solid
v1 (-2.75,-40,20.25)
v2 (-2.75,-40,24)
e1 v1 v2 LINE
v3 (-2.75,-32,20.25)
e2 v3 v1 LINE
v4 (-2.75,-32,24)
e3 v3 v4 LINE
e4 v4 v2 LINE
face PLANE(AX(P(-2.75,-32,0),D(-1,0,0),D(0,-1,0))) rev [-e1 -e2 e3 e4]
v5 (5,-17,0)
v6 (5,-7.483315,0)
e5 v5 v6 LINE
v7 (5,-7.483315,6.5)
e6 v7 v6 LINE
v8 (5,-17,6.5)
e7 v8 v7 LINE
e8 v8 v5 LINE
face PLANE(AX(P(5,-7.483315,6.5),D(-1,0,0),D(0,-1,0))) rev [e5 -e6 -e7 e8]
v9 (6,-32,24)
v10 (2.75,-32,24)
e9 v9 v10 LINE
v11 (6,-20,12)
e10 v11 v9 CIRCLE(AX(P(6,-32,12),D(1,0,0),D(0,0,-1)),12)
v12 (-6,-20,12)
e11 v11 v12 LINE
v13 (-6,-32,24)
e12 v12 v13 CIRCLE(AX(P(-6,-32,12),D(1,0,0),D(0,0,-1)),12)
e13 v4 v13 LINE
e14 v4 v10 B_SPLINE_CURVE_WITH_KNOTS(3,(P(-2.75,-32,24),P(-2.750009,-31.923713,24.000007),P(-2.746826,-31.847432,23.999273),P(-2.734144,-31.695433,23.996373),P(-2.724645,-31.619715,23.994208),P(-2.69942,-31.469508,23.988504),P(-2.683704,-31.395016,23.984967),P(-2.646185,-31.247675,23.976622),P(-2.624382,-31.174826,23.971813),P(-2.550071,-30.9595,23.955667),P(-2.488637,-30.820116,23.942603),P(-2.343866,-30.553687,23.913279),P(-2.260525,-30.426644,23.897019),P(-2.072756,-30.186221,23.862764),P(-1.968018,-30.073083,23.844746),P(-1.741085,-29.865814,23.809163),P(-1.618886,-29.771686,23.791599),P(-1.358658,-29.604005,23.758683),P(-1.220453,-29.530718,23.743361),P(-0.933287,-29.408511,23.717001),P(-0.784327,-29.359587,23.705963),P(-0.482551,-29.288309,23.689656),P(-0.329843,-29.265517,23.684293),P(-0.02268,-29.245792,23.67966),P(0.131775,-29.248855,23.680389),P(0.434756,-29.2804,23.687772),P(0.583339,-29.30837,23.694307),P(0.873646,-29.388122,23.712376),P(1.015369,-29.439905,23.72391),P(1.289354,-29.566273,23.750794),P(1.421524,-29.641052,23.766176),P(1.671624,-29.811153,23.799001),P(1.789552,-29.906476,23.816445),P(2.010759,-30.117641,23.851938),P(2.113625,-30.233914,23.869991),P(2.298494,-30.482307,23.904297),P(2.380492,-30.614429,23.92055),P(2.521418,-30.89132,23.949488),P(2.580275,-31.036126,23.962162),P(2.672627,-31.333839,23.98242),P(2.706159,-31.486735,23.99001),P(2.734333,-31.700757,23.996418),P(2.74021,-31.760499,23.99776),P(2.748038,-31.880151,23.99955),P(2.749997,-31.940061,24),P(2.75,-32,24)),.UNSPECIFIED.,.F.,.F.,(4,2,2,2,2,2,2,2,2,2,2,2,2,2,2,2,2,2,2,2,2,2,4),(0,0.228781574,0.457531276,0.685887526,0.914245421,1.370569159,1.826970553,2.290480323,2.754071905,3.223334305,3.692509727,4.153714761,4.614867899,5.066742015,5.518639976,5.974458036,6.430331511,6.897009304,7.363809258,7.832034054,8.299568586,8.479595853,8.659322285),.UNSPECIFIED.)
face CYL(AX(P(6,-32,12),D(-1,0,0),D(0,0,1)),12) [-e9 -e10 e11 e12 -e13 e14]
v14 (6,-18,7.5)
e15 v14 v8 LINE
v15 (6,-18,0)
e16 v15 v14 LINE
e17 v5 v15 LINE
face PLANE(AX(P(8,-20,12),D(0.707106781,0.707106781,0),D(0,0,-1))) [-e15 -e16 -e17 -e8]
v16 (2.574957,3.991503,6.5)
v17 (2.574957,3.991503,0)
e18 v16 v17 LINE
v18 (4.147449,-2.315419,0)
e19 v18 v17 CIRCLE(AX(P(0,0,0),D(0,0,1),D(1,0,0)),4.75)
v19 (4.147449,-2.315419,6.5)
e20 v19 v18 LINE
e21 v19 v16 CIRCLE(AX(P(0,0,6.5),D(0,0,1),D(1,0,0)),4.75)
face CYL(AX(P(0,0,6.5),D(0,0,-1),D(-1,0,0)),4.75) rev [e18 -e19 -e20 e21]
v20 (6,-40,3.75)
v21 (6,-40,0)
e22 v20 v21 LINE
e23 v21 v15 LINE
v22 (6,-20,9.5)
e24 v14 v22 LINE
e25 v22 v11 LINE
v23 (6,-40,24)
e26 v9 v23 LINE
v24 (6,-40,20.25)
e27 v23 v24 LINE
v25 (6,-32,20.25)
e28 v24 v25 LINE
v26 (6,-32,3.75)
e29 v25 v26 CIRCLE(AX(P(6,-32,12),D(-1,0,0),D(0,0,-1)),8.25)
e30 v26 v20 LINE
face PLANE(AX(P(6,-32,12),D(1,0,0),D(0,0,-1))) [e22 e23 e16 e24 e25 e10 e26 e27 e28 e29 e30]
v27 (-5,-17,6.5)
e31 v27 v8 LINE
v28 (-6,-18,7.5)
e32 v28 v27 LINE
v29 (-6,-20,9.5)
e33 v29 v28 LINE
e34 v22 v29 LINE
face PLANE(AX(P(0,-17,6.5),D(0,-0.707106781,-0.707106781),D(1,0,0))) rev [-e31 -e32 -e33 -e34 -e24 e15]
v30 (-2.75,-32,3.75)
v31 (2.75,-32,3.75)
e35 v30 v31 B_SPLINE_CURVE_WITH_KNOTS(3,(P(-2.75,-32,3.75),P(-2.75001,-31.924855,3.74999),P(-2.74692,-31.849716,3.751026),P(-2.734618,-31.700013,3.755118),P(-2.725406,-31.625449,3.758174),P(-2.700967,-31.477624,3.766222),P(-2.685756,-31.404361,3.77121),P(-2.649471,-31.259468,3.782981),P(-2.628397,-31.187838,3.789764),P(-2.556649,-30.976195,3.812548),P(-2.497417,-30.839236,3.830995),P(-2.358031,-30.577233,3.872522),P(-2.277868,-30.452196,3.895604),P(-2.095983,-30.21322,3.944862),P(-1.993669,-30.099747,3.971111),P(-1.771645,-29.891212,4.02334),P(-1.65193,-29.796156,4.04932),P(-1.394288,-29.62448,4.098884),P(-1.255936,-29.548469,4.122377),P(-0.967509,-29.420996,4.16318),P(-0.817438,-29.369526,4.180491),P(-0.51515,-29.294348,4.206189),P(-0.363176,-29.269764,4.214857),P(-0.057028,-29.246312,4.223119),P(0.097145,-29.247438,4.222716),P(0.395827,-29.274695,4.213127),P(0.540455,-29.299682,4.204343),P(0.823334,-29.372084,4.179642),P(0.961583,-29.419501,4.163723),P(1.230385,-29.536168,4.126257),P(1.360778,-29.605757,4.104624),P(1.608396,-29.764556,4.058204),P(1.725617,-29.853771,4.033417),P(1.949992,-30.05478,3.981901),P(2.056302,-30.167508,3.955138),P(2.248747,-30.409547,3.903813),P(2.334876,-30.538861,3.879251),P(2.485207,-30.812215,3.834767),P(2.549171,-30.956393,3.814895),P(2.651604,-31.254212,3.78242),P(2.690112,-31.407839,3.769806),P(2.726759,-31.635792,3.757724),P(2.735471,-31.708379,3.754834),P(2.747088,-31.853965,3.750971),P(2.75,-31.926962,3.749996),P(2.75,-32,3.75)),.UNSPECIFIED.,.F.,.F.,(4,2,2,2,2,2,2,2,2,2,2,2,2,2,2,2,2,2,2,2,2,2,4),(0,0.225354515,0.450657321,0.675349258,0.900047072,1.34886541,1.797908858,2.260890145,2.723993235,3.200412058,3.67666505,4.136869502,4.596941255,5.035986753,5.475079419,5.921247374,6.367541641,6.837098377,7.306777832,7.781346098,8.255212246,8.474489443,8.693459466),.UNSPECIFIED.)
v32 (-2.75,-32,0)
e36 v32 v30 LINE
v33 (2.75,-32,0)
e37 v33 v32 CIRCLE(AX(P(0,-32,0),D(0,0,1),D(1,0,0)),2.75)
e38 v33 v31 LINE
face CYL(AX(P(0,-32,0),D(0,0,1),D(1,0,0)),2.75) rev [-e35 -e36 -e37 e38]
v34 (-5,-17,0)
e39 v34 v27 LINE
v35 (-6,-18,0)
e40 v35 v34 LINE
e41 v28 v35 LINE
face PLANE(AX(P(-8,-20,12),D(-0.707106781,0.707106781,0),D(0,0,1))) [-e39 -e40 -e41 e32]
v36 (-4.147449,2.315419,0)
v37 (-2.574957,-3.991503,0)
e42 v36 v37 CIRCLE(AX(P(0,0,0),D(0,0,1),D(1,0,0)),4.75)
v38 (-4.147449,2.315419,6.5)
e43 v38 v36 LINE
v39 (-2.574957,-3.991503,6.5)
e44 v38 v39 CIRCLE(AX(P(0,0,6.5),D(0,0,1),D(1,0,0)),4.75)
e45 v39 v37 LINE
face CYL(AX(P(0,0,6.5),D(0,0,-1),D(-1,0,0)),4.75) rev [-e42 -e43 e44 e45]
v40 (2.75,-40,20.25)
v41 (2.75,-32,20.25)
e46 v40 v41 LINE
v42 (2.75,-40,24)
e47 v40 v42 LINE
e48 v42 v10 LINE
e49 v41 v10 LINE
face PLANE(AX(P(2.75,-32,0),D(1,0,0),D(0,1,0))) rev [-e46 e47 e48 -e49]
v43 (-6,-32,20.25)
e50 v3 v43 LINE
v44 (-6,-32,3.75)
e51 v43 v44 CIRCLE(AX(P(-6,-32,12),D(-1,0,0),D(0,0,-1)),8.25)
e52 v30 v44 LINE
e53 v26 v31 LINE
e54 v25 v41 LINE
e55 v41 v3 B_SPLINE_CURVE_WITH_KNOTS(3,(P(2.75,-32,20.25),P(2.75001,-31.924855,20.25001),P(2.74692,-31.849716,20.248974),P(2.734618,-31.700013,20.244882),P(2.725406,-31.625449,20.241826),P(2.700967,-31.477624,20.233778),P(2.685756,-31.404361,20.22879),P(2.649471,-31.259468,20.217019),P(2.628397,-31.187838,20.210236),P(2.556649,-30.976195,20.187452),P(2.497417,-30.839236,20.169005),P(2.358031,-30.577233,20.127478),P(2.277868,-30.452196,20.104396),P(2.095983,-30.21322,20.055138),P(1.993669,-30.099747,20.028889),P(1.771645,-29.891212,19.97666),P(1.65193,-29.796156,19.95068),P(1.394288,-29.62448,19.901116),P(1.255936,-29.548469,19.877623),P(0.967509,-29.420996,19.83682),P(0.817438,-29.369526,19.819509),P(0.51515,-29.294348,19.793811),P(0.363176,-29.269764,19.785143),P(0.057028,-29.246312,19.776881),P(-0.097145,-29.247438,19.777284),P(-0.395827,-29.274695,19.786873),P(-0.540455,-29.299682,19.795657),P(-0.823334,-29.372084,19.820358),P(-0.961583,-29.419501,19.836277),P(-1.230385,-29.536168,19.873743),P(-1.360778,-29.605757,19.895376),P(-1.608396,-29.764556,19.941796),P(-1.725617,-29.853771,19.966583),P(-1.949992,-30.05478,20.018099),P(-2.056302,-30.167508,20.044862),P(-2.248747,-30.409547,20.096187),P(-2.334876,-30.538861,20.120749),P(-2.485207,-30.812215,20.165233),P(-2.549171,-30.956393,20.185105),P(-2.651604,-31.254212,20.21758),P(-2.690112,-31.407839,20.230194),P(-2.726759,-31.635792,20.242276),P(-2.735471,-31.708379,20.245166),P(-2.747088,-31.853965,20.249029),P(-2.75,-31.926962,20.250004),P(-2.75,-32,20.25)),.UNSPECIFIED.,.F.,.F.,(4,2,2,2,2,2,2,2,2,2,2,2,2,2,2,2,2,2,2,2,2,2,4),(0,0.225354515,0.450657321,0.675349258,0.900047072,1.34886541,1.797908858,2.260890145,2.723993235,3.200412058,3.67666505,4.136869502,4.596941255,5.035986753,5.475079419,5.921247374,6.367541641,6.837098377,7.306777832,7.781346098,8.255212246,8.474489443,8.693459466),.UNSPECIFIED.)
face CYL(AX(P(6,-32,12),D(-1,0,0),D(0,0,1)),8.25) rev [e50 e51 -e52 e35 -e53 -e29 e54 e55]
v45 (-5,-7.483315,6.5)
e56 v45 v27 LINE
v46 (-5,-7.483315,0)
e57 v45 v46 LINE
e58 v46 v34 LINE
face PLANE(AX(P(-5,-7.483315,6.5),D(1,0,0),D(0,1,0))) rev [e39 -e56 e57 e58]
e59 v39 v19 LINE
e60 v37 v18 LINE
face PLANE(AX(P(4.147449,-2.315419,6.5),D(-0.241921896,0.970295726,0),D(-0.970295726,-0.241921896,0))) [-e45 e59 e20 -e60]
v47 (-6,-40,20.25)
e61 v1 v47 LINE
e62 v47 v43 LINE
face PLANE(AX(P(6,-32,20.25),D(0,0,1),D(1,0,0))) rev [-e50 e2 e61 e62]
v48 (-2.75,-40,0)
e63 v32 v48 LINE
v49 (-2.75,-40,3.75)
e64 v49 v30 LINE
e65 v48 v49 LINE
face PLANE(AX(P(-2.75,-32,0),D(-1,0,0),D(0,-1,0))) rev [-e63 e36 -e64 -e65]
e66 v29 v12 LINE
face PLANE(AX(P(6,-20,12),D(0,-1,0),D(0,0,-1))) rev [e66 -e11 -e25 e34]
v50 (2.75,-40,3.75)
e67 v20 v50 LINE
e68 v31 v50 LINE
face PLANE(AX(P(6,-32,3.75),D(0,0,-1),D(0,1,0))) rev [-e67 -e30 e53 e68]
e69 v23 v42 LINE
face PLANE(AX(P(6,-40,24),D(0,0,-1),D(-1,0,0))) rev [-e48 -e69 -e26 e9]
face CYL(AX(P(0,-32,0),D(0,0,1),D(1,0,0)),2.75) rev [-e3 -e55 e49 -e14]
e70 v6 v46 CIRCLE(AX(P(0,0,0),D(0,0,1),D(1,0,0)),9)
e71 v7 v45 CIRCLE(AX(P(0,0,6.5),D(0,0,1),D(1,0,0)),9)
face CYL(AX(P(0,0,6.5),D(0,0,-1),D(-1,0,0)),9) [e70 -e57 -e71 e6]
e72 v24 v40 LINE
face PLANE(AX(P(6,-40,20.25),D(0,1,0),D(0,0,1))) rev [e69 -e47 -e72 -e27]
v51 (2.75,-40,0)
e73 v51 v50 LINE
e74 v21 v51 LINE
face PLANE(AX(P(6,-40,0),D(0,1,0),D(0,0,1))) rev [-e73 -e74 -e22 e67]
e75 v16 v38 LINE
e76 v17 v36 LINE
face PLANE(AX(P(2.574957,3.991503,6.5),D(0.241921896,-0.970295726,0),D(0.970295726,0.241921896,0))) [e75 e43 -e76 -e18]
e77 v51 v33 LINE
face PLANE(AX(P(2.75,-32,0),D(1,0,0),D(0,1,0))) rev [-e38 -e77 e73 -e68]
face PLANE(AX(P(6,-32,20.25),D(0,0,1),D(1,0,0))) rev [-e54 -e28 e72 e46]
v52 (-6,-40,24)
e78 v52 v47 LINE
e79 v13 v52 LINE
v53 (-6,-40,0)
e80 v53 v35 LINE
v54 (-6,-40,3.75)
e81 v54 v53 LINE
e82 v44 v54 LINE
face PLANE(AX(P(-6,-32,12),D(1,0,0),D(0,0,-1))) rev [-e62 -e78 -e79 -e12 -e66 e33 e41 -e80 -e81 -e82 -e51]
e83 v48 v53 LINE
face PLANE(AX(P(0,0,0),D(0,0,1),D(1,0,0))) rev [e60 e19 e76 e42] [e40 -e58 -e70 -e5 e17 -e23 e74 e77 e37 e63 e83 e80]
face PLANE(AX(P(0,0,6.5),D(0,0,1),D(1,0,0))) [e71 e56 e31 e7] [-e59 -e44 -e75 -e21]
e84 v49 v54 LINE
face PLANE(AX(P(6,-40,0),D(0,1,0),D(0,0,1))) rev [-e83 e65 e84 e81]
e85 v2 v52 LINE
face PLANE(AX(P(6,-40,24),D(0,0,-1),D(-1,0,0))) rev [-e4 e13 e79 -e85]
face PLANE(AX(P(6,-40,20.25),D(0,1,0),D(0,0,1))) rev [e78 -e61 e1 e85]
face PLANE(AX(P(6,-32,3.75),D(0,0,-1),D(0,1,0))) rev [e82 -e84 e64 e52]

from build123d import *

# Parameters (mm, degrees)
BOSS_EXTRUDE1_DEPTH = 6.5
BOSS_EXTRUDE2_DEPTH = 6
CUT_EXTRUDE1_DEPTH  = 48.507894081
CHAMFER1_SIZE       = 3


with BuildPart() as part:
    # Sketch1 → Boss-Extrude1 (new body)
    with BuildSketch(Plane.XY):
        with BuildLine():
            Line((-5, -7.483314774), (-5, -22))
            Line((-5, -22), (5, -22))
            Line((5, -22), (5, -7.483314774))
            ThreePointArc((5, -7.483314774), (0, 9), (-5, -7.483314774))
        make_face()
        with BuildLine():
            Line((2.574956832, 3.99150314), (-4.147449153, 2.315419081))
            ThreePointArc((-4.147449153, 2.315419081), (-4.6089047, -1.149129004), (-2.574956832, -3.99150314))
            Line((-2.574956832, -3.99150314), (4.147449153, -2.315419081))
            ThreePointArc((4.147449153, -2.315419081), (4.6089047, 1.149129004), (2.574956832, 3.99150314))
        make_face(mode=Mode.SUBTRACT)
    extrude(amount=BOSS_EXTRUDE1_DEPTH)

    # Sketch2 → Boss-Extrude2 (add, symmetric)
    with BuildSketch(Plane(origin=(0, 0, 0), x_dir=(0, 0, -1), z_dir=(1, 0, 0))):
        with BuildLine():
            Line((-12, -20), (0, -20))
            Line((0, -20), (0, -40))
            Line((0, -40), (-3.75, -40))
            Line((-3.75, -40), (-3.75, -32))
            ThreePointArc((-3.75, -32), (-12, -23.75), (-20.25, -32))
            Line((-20.25, -32), (-20.25, -40))
            Line((-20.25, -40), (-24, -40))
            Line((-24, -40), (-24, -32))
            ThreePointArc((-24, -32), (-20.485281374, -23.514718626), (-12, -20))
        make_face()
    extrude(amount=BOSS_EXTRUDE2_DEPTH, both=True)

    # Sketch4 → Cut-Extrude1 (cut, through all)
    with BuildSketch(Plane.XY.offset(24)):
        with BuildLine():
            Line((-2.75, -32), (-2.75, -40))
            Line((-2.75, -40), (2.75, -40))
            Line((2.75, -40), (2.75, -32))
            ThreePointArc((2.75, -32), (0, -29.25), (-2.75, -32))
        make_face()
    extrude(amount=-CUT_EXTRUDE1_DEPTH, mode=Mode.SUBTRACT)

    # Chamfer1
    # the kernel refuses this chamfer: 3 mm, written as the material it adds along each edge
    with BuildSketch(Plane(origin=(-5, -20, 6.5), x_dir=(0.02749587661058619, 0.9996219169112968, 0), z_dir=(0, 0, -1))) as chamfer1_piece_1_section:
        Polygon((CHAMFER1_SIZE * 0.999621916911, -CHAMFER1_SIZE * 0.0274958766106), (-CHAMFER1_SIZE * 0.0274958766106, -CHAMFER1_SIZE * 0.999621916911), (0, 0), align=None)
    chamfer1_piece_1 = extrude(amount=6.5, mode=Mode.PRIVATE)
    chamfer1_piece_1 = split(chamfer1_piece_1, bisect_by=Plane(origin=(-6, -18.713879333, 3.25), z_dir=(1, 0, 0)), keep=Keep.TOP, mode=Mode.PRIVATE)
    add(chamfer1_piece_1)
    with BuildSketch(Plane(origin=(-5, -20, 6.5), x_dir=(0, -0.02749587661058678, 0.9996219169112968), z_dir=(1, 0, 0))) as chamfer1_piece_2:
        Polygon((CHAMFER1_SIZE * 0.999621916911, -CHAMFER1_SIZE * 0.0274958766106), (-CHAMFER1_SIZE * 0.0274958766106, -CHAMFER1_SIZE * 0.999621916911), (0, 0), align=None)
    extrude(amount=10)
    with BuildSketch(Plane(origin=(5, -20, 0), x_dir=(0.9996219169112968, -0.02749587661058678, 0), z_dir=(0, 0, 1))) as chamfer1_piece_3_section:
        Polygon((CHAMFER1_SIZE * 0.999621916911, CHAMFER1_SIZE * 0.0274958766106), (-CHAMFER1_SIZE * 0.0274958766106, CHAMFER1_SIZE * 0.999621916911), (0, 0), align=None)
    chamfer1_piece_3 = extrude(amount=6.5, mode=Mode.PRIVATE)
    chamfer1_piece_3 = split(chamfer1_piece_3, bisect_by=Plane(origin=(6, -18.713879333, 3.25), z_dir=(-1, 0, 0)), keep=Keep.TOP, mode=Mode.PRIVATE)
    add(chamfer1_piece_3)
    with BuildSketch(Plane(origin=(-5, -20, 14.215048964), x_dir=(0.02749587661058619, 0.9996219169112968, 0), z_dir=(0, 0, -1))) as chamfer1_piece_4a_section:
        Polygon((CHAMFER1_SIZE * 0.999621916911, -CHAMFER1_SIZE * 0.0274958766106), (-CHAMFER1_SIZE * 0.0274958766106, -CHAMFER1_SIZE * 0.999621916911), (0, 0), align=None)
    chamfer1_piece_4a = extrude(amount=14.215048964, mode=Mode.PRIVATE)
    chamfer1_piece_4a = split(chamfer1_piece_4a, bisect_by=Plane(origin=(-5.42545334, -18.713879333, 6.5), z_dir=(0, 0, 1)), keep=Keep.TOP, mode=Mode.PRIVATE)
    chamfer1_piece_4a = split(chamfer1_piece_4a, bisect_by=Plane(origin=(-6, -18.713879333, 10.357524482), z_dir=(1, 0, 0)), keep=Keep.TOP, mode=Mode.PRIVATE)
    with BuildSketch(Plane(origin=(-12.715048964, -20, 6.5), x_dir=(0, -0.02749587661058678, 0.9996219169112968), z_dir=(1, 0, 0))) as chamfer1_piece_4b_section:
        Polygon((CHAMFER1_SIZE * 0.999621916911, -CHAMFER1_SIZE * 0.0274958766106), (-CHAMFER1_SIZE * 0.0274958766106, -CHAMFER1_SIZE * 0.999621916911), (0, 0), align=None)
    chamfer1_piece_4b = extrude(amount=17.715048964, mode=Mode.PRIVATE)
    chamfer1_piece_4b = split(chamfer1_piece_4b, bisect_by=Plane(origin=(-5, -19.01061912, 7.48938088), z_dir=(-1, 0, 0)), keep=Keep.TOP, mode=Mode.PRIVATE)
    chamfer1_piece_4b = split(chamfer1_piece_4b, bisect_by=Plane(origin=(-6, -19.01061912, 7.48938088), z_dir=(1, 0, 0)), keep=Keep.TOP, mode=Mode.PRIVATE)
    chamfer1_piece_4 = chamfer1_piece_4a & chamfer1_piece_4b
    add(chamfer1_piece_4)
    with BuildSketch(Plane(origin=(5, -20, 0), x_dir=(0.9996219169112968, -0.02749587661058678, 0), z_dir=(0, 0, 1))) as chamfer1_piece_5a_section:
        Polygon((CHAMFER1_SIZE * 0.999621916911, CHAMFER1_SIZE * 0.0274958766106), (-CHAMFER1_SIZE * 0.0274958766106, CHAMFER1_SIZE * 0.999621916911), (0, 0), align=None)
    chamfer1_piece_5a = extrude(amount=14.215048964, mode=Mode.PRIVATE)
    chamfer1_piece_5a = split(chamfer1_piece_5a, bisect_by=Plane(origin=(6, -18.713879333, 10.357524482), z_dir=(-1, 0, 0)), keep=Keep.TOP, mode=Mode.PRIVATE)
    chamfer1_piece_5a = split(chamfer1_piece_5a, bisect_by=Plane(origin=(5.42545334, -18.713879333, 6.5), z_dir=(0, 0, 1)), keep=Keep.TOP, mode=Mode.PRIVATE)
    with BuildSketch(Plane(origin=(-5, -20, 6.5), x_dir=(0, -0.02749587661058678, 0.9996219169112968), z_dir=(1, 0, 0))) as chamfer1_piece_5b_section:
        Polygon((CHAMFER1_SIZE * 0.999621916911, -CHAMFER1_SIZE * 0.0274958766106), (-CHAMFER1_SIZE * 0.0274958766106, -CHAMFER1_SIZE * 0.999621916911), (0, 0), align=None)
    chamfer1_piece_5b = extrude(amount=17.715048964, mode=Mode.PRIVATE)
    chamfer1_piece_5b = split(chamfer1_piece_5b, bisect_by=Plane(origin=(6, -19.01061912, 7.48938088), z_dir=(-1, 0, 0)), keep=Keep.TOP, mode=Mode.PRIVATE)
    chamfer1_piece_5b = split(chamfer1_piece_5b, bisect_by=Plane(origin=(5, -19.01061912, 7.48938088), z_dir=(1, 0, 0)), keep=Keep.TOP, mode=Mode.PRIVATE)
    chamfer1_piece_5 = chamfer1_piece_5a & chamfer1_piece_5b
    add(chamfer1_piece_5)


solid = part.part
